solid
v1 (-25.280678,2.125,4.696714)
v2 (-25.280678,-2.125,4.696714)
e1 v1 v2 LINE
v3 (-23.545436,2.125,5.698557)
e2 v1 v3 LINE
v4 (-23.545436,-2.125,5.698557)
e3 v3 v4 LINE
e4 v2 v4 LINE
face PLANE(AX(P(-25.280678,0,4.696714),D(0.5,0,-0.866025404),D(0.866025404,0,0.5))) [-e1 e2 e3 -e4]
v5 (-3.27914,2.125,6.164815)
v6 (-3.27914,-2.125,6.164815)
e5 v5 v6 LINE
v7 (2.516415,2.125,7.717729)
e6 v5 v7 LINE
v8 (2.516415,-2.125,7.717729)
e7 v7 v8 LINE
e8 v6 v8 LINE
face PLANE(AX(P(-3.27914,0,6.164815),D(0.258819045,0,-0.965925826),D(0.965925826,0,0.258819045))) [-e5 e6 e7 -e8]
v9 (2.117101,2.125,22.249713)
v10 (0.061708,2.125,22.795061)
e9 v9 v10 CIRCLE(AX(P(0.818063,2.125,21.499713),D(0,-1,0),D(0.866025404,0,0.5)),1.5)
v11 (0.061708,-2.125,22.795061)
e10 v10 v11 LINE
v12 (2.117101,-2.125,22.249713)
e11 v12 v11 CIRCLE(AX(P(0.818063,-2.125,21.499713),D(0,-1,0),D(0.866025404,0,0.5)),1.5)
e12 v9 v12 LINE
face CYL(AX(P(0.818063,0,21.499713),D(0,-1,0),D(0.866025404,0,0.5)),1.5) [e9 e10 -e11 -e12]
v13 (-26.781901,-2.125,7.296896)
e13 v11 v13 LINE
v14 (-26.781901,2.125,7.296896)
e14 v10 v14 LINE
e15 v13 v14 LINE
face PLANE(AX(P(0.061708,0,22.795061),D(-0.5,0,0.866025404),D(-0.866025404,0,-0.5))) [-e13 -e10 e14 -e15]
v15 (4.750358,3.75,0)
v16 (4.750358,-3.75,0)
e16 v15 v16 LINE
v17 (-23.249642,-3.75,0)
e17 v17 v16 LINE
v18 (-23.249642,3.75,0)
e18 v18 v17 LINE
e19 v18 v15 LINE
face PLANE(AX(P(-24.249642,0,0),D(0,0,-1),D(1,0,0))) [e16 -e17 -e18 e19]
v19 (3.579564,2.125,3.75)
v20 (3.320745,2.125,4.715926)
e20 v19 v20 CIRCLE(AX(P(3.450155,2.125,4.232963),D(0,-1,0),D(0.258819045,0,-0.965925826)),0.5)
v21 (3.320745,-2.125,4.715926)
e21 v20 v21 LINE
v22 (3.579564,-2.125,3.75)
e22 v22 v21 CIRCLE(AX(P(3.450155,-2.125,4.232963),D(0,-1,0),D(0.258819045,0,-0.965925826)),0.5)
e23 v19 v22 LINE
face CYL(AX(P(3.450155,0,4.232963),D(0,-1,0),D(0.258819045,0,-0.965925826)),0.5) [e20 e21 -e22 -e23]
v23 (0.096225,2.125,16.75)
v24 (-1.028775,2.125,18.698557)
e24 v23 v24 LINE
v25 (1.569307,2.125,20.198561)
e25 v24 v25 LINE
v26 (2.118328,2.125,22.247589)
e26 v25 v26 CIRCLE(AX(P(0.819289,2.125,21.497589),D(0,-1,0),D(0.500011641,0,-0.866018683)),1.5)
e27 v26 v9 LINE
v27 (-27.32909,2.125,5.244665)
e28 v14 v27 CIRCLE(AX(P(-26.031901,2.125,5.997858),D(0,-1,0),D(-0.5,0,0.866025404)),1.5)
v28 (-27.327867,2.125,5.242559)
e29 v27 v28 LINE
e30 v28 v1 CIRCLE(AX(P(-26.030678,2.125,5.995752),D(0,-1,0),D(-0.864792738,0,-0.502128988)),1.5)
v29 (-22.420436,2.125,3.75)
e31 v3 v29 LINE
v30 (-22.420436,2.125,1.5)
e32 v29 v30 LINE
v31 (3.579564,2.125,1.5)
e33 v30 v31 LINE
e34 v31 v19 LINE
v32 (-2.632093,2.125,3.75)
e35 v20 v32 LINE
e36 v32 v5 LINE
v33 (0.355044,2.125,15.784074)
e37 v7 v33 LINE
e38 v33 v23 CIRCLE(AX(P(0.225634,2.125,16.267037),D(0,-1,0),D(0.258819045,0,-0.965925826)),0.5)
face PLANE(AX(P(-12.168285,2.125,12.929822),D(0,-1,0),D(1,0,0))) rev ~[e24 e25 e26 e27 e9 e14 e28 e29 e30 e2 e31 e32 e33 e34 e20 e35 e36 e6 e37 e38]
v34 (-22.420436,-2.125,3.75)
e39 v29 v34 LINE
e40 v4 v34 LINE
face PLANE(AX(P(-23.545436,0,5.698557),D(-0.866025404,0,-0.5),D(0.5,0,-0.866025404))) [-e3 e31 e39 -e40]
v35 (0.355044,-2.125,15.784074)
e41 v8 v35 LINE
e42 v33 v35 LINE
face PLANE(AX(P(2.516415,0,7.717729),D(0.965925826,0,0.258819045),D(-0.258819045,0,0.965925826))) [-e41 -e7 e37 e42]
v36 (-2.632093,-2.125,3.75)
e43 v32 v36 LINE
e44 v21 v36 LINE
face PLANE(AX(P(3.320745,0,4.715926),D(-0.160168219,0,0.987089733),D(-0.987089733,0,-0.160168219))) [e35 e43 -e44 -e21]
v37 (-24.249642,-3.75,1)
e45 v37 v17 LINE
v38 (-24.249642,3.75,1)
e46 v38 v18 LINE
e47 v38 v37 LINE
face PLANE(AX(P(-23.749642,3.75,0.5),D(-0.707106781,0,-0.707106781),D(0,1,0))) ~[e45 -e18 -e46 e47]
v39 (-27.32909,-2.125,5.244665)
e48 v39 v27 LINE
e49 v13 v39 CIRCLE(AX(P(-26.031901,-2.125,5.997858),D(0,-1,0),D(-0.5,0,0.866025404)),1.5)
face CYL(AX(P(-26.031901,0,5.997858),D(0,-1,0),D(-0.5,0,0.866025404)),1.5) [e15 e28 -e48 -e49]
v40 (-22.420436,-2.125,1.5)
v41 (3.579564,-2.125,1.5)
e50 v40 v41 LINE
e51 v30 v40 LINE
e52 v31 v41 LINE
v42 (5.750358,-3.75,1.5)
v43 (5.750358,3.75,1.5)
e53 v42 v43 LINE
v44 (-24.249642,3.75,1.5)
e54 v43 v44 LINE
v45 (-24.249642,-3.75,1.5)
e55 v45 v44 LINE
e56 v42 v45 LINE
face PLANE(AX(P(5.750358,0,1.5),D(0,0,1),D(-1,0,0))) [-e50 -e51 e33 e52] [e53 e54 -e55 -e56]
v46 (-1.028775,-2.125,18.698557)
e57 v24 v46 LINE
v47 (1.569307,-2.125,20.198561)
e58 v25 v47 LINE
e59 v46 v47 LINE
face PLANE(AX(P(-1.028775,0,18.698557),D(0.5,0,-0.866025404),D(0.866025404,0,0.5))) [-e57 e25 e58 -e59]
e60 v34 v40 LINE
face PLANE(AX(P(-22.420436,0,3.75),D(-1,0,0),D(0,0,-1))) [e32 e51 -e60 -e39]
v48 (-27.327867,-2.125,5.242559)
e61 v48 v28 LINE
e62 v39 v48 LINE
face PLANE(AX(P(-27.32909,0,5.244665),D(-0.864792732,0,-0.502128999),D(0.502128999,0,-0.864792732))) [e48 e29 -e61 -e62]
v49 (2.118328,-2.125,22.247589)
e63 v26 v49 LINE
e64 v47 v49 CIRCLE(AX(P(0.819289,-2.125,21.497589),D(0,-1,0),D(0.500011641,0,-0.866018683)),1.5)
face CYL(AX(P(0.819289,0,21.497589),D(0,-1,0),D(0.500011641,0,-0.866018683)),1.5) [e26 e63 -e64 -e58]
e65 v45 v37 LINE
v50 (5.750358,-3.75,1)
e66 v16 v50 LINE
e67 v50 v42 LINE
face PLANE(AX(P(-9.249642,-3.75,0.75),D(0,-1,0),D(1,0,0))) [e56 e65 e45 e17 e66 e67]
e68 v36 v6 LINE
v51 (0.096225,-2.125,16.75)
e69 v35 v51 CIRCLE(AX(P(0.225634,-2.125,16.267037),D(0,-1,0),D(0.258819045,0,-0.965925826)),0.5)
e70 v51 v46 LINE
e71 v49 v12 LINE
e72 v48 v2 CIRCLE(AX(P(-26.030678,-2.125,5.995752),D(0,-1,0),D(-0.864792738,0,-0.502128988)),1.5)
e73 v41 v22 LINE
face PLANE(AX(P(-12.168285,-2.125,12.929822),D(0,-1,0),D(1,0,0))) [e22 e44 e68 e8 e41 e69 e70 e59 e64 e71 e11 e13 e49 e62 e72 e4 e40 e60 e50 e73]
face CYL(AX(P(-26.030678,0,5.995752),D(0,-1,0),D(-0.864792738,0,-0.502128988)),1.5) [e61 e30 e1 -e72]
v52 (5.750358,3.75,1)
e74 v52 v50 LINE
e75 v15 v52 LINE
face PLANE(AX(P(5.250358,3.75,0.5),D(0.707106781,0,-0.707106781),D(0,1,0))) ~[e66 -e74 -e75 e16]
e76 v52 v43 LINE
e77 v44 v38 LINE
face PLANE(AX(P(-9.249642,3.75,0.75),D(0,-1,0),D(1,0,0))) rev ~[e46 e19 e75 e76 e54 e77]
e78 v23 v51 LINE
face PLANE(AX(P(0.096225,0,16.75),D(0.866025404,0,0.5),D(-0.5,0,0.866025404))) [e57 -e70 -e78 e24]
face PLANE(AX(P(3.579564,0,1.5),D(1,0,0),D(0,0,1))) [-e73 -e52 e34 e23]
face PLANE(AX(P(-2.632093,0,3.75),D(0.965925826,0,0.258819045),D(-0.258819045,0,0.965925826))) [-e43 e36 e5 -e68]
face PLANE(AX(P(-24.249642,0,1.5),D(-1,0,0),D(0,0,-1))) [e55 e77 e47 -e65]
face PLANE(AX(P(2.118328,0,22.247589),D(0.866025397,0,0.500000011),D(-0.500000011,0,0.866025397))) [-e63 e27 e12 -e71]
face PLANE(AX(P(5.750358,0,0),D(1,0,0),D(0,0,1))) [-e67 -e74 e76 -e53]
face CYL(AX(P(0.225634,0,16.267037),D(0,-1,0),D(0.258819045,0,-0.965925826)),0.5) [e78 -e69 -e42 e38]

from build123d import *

# Parameters (mm, degrees)
F1_DEPTH = 3.75
F2_DEPTH = 2.125
F3_SIZE  = 1


# Not quite as in the source:
# - a feature names something its author has since deleted; it is built from what else it names


with BuildPart() as f1:
    # F0 (on Front) → F1 (new body, symmetric)
    with BuildSketch(Plane.XZ):
        Polygon((-22.420435602, 1.5), (-24.2496415957, 1.5), (-24.2496415957, 0), (5.7503584043, 0), (5.7503584043, 1.5), (3.579564398, 1.5), align=None)
    extrude(amount=F1_DEPTH, both=True)

    # F0 (on Front) → F2 (join, symmetric)
    with BuildSketch(Plane.XZ):
        with BuildLine():
            Line((-23.545435602, 5.6985571585), (-22.420435602, 3.75))
            Line((-22.420435602, 3.75), (0.0962248963, 16.75))
            Line((0.0962248963, 16.75), (-1.0287751037, 18.6985571585))
            Line((-1.0287751037, 18.6985571585), (1.5693069281, 20.1985605189))
            ThreePointArc((1.5693069281, 20.1985605189), (2.2681808156, 21.1093697133), (2.1183275727, 22.2475885433))
            Line((2.1183275727, 22.2475885433), (2.117101021, 22.2497129931))
            ThreePointArc((2.117101021, 22.2497129931), (1.2027410199, 22.9495484169), (0.0617075083, 22.7950610152))
            Line((0.0617075083, 22.7950610152), (-26.7819009783, 7.2968964295))
            ThreePointArc((-26.7819009783, 7.2968964295), (-27.4812661607, 6.3843043976), (-27.329090085, 5.2446648418))
            Line((-27.329090085, 5.2446648418), (-27.3278673466, 5.242558978))
            ThreePointArc((-27.3278673466, 5.242558978), (-26.4171243137, 4.5463872777), (-25.2806782399, 4.6967143544))
            Line((-25.2806782399, 4.6967143544), (-23.545435602, 5.6985571585))
        make_face()
        Polygon((0.0962248963, 16.75), (-22.420435602, 3.75), (-2.6320926845, 3.75), (-3.2791402973, 6.1648145657), (2.5164146605, 7.7177288363), (0.3550439415, 15.7840741737), align=None)
        Polygon((-22.420435602, 3.75), (-22.420435602, 1.5), (3.579564398, 1.5), (3.579564398, 3.75), (-2.6320926845, 3.75), align=None)
        Polygon((-2.6320926845, 3.75), (3.579564398, 3.75), (3.3207453529, 4.7159258263), align=None)
        with BuildLine():
            Line((3.3207453529, 4.7159258263), (3.579564398, 3.75))
            ThreePointArc((3.579564398, 3.75), (3.9331177885, 4.3623724357), (3.3207453529, 4.7159258263))
        make_face()
        with BuildLine():
            ThreePointArc((0.3550439415, 15.7840741737), (0.708597332, 16.3964466094), (0.0962248963, 16.75))
            Line((0.0962248963, 16.75), (0.3550439415, 15.7840741737))
        make_face()
    extrude(amount=F2_DEPTH, both=True)

    # F3
    f3_edges = [f1.edges().sort_by_distance(p)[0] for p in [
        (-24.249642, 0, 0),
        (5.750358, 0, 0),
    ]]
    chamfer(f3_edges, length=F3_SIZE)


solid = f1.part
